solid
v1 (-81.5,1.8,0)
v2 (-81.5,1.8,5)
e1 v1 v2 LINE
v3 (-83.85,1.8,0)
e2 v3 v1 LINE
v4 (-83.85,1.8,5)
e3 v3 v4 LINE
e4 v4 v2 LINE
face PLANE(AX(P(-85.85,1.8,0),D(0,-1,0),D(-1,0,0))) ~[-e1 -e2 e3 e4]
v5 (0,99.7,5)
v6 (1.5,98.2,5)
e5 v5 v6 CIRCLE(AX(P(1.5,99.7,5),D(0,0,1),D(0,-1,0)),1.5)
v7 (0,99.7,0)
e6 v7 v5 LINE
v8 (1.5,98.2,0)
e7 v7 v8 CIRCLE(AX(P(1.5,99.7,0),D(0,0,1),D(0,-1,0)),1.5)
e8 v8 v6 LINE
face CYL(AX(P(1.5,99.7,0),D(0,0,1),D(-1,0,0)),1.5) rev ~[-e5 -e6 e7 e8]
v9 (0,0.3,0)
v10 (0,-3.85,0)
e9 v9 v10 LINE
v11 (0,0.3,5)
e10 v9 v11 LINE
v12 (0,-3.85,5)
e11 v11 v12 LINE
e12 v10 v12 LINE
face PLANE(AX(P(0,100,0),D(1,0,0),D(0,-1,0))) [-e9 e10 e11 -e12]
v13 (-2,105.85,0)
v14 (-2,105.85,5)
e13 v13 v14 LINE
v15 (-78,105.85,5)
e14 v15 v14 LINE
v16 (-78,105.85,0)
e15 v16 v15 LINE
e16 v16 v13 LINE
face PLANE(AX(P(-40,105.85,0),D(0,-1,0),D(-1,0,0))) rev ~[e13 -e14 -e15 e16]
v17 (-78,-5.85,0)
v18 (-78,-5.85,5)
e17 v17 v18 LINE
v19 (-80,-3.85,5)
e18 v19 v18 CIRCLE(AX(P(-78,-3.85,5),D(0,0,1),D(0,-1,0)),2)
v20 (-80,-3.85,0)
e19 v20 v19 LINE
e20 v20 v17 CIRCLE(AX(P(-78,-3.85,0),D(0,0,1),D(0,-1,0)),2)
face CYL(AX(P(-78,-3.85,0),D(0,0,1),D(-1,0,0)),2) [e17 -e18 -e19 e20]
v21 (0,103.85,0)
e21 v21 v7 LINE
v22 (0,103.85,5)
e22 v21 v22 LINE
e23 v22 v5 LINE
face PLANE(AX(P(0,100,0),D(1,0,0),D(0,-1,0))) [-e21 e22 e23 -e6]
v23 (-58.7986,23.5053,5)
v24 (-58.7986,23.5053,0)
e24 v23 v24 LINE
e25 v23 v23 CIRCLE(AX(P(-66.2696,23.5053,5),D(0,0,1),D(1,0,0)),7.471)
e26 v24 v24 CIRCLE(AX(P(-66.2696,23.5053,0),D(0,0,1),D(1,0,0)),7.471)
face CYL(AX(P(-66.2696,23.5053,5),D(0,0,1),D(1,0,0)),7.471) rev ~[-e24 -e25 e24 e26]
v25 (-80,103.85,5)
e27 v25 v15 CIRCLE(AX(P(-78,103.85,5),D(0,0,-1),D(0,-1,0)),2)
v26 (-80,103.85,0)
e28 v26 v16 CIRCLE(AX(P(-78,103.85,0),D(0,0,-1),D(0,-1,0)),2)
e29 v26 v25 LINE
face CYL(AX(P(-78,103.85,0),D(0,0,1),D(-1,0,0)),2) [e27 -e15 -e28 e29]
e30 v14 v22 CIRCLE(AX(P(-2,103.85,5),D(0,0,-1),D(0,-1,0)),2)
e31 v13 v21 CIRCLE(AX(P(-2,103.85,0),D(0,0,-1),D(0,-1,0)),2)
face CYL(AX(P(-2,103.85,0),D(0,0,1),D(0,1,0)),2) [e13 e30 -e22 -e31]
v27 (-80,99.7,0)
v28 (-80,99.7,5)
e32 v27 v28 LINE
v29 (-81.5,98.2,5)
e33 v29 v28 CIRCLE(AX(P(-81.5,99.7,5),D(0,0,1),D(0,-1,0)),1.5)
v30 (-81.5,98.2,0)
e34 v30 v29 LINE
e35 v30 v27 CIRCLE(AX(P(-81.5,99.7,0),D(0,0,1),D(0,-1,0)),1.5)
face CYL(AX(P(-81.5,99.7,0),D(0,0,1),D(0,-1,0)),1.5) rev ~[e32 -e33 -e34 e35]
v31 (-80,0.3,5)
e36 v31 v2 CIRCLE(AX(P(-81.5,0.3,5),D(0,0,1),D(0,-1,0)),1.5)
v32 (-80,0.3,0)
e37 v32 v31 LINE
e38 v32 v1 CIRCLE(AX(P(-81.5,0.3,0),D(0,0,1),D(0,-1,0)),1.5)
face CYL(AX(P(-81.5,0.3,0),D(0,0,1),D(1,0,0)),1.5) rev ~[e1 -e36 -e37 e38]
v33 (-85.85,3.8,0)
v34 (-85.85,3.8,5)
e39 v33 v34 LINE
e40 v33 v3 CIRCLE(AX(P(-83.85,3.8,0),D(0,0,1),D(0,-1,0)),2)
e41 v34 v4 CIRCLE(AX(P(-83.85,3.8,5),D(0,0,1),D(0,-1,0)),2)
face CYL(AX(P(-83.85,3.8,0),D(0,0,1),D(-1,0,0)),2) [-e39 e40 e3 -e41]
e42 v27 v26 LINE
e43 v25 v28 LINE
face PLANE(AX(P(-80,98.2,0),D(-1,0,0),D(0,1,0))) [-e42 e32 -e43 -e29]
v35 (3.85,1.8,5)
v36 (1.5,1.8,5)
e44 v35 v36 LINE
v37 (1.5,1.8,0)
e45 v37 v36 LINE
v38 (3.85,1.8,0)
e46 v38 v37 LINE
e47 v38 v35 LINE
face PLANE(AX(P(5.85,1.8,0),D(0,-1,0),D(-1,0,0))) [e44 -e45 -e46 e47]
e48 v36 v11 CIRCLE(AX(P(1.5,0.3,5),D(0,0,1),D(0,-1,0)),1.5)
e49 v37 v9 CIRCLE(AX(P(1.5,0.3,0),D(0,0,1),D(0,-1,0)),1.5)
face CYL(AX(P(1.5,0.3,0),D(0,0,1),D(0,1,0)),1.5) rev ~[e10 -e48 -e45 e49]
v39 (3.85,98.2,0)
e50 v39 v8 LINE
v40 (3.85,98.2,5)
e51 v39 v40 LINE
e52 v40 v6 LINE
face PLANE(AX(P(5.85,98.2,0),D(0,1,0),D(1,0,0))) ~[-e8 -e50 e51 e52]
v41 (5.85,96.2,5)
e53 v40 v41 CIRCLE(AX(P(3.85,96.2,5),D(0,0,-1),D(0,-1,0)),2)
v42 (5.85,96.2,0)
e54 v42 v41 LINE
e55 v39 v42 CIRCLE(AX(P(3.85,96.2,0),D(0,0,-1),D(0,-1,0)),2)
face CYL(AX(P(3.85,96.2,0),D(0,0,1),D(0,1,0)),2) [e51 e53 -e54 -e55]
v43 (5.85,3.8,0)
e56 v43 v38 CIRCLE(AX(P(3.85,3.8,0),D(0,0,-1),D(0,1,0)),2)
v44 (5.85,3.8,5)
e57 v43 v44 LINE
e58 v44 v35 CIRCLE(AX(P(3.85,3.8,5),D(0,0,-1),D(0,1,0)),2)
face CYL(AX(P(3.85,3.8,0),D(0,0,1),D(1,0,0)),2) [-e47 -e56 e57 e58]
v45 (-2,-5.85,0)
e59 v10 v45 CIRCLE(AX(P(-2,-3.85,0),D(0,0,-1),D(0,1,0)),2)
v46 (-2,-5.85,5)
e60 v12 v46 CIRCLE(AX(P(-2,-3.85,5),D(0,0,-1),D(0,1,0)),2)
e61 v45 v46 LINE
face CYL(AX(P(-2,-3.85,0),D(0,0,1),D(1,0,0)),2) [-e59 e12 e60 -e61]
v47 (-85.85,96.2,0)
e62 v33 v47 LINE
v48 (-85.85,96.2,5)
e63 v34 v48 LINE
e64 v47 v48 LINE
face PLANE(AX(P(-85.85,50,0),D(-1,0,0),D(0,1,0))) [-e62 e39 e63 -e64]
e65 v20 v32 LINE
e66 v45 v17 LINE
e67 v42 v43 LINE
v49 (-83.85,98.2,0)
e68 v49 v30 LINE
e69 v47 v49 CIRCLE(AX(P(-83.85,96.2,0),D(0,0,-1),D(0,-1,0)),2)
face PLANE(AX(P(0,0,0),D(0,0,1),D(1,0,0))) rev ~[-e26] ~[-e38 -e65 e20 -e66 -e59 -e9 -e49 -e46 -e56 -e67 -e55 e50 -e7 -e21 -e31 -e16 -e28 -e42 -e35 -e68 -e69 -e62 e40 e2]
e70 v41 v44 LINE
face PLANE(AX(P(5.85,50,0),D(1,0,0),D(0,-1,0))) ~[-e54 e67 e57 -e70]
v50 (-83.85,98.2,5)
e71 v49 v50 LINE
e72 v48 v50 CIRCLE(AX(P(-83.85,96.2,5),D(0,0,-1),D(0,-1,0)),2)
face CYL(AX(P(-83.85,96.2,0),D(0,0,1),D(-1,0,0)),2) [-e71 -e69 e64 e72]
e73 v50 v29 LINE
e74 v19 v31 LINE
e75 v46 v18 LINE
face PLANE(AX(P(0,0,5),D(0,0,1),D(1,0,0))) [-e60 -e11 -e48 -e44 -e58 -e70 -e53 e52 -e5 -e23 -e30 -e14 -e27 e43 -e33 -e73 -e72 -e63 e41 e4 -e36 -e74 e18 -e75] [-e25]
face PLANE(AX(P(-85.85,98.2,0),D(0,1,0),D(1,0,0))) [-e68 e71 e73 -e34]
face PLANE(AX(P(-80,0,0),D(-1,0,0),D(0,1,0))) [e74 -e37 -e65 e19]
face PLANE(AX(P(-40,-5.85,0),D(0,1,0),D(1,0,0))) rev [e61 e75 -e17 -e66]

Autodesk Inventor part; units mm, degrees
ref_plane "YZ Plane" through (0, 0, 0) normal (1, 0, 0) x (0, 1, 0)
ref_plane "XZ Plane" through (0, 0, 0) normal (0, 1, 0) x (-1, 0, 0)
ref_plane "XY Plane" through (0, 0, 0) normal (0, 0, 1) x (1, 0, 0)
sketch "Skizze3" plane through (0, 0, 0) normal (0, 0, 1) x (1, 0, 0)
  line L0 (0, 0) -> (-80, 0)
  line L1 (-80, 0) -> (-80, 100)
  line L2 (-80, 100) -> (0, 100)
  line L3 (0, 100) -> (0, 0)
  line L4 (-80, 100) -> (0, 100)
  line L5 (-40, 105.85) -> (-80, 105.85)
  line L6 (-80, 105.85) -> (-80, 100)
  line L7 (-80, 50) -> (-85.85, 50)
  line L8 (-85.85, 50) -> (-85.85, 98.2)
  line L9 (-85.85, 98.2) -> (-80, 98.2)
  line L10 (-80, 98.2) -> (-80, 50)
  line L11 (-40, 105.85) -> (-40, 100)
  dimension "d4" = 100
  dimension "d5" = 80
  dimension "d6" = 5.85
  dimension "d7" = 5.85
  dimension "d8" = 1.8
extrude "Extrusion3" add sketch "Skizze3" along normal blind 5 contours L0 L1 L2 L3
extrude "Extrusion4" add sketch "Skizze3" along normal blind 5 contours L7 L8 L9 L1 | L2 L6 L5 L11
fillet "Rundung1" radius 2 2 edges at (-85.85, 98.2, 2.5) (-80, 105.85, 2.5)
mirror "Spiegeln1" about plane through (-85.85, 50, 0) normal (0, -1, 0) of "Extrusion4", "Rundung1"
mirror "Spiegeln2" about plane through (-40, 0, 0) normal (1, 0, 0) of "Extrusion4", "Rundung1", "Spiegeln1"
fillet "Rundung2" radius 1.5 4 edges at (-80, 98.2, 2.5) (-80, 1.8, 2.5) (0, 1.8, 2.5) (0, 98.2, 2.5)
sketch "Skizze4" plane through (0, 0, 5) normal (0, 0, 1) x (1, 0, 0)
  circle A0 centre (-66.2696, 23.5053) radius 7.471
  point P0 (0, 0)
  point P1 (-74.5257, 11.4963)
  point P2 (-75.2763, 39.7173)
  point P3 (-61.9163, 37.7659)
  point P4 (-59.3644, 15.2491)
extrude "Extrusion5" cut sketch "Skizze4" against normal blind 10
equation "\"d7\" = d6"
properties part number "BT701_trajan20_21" material "Acryl"
